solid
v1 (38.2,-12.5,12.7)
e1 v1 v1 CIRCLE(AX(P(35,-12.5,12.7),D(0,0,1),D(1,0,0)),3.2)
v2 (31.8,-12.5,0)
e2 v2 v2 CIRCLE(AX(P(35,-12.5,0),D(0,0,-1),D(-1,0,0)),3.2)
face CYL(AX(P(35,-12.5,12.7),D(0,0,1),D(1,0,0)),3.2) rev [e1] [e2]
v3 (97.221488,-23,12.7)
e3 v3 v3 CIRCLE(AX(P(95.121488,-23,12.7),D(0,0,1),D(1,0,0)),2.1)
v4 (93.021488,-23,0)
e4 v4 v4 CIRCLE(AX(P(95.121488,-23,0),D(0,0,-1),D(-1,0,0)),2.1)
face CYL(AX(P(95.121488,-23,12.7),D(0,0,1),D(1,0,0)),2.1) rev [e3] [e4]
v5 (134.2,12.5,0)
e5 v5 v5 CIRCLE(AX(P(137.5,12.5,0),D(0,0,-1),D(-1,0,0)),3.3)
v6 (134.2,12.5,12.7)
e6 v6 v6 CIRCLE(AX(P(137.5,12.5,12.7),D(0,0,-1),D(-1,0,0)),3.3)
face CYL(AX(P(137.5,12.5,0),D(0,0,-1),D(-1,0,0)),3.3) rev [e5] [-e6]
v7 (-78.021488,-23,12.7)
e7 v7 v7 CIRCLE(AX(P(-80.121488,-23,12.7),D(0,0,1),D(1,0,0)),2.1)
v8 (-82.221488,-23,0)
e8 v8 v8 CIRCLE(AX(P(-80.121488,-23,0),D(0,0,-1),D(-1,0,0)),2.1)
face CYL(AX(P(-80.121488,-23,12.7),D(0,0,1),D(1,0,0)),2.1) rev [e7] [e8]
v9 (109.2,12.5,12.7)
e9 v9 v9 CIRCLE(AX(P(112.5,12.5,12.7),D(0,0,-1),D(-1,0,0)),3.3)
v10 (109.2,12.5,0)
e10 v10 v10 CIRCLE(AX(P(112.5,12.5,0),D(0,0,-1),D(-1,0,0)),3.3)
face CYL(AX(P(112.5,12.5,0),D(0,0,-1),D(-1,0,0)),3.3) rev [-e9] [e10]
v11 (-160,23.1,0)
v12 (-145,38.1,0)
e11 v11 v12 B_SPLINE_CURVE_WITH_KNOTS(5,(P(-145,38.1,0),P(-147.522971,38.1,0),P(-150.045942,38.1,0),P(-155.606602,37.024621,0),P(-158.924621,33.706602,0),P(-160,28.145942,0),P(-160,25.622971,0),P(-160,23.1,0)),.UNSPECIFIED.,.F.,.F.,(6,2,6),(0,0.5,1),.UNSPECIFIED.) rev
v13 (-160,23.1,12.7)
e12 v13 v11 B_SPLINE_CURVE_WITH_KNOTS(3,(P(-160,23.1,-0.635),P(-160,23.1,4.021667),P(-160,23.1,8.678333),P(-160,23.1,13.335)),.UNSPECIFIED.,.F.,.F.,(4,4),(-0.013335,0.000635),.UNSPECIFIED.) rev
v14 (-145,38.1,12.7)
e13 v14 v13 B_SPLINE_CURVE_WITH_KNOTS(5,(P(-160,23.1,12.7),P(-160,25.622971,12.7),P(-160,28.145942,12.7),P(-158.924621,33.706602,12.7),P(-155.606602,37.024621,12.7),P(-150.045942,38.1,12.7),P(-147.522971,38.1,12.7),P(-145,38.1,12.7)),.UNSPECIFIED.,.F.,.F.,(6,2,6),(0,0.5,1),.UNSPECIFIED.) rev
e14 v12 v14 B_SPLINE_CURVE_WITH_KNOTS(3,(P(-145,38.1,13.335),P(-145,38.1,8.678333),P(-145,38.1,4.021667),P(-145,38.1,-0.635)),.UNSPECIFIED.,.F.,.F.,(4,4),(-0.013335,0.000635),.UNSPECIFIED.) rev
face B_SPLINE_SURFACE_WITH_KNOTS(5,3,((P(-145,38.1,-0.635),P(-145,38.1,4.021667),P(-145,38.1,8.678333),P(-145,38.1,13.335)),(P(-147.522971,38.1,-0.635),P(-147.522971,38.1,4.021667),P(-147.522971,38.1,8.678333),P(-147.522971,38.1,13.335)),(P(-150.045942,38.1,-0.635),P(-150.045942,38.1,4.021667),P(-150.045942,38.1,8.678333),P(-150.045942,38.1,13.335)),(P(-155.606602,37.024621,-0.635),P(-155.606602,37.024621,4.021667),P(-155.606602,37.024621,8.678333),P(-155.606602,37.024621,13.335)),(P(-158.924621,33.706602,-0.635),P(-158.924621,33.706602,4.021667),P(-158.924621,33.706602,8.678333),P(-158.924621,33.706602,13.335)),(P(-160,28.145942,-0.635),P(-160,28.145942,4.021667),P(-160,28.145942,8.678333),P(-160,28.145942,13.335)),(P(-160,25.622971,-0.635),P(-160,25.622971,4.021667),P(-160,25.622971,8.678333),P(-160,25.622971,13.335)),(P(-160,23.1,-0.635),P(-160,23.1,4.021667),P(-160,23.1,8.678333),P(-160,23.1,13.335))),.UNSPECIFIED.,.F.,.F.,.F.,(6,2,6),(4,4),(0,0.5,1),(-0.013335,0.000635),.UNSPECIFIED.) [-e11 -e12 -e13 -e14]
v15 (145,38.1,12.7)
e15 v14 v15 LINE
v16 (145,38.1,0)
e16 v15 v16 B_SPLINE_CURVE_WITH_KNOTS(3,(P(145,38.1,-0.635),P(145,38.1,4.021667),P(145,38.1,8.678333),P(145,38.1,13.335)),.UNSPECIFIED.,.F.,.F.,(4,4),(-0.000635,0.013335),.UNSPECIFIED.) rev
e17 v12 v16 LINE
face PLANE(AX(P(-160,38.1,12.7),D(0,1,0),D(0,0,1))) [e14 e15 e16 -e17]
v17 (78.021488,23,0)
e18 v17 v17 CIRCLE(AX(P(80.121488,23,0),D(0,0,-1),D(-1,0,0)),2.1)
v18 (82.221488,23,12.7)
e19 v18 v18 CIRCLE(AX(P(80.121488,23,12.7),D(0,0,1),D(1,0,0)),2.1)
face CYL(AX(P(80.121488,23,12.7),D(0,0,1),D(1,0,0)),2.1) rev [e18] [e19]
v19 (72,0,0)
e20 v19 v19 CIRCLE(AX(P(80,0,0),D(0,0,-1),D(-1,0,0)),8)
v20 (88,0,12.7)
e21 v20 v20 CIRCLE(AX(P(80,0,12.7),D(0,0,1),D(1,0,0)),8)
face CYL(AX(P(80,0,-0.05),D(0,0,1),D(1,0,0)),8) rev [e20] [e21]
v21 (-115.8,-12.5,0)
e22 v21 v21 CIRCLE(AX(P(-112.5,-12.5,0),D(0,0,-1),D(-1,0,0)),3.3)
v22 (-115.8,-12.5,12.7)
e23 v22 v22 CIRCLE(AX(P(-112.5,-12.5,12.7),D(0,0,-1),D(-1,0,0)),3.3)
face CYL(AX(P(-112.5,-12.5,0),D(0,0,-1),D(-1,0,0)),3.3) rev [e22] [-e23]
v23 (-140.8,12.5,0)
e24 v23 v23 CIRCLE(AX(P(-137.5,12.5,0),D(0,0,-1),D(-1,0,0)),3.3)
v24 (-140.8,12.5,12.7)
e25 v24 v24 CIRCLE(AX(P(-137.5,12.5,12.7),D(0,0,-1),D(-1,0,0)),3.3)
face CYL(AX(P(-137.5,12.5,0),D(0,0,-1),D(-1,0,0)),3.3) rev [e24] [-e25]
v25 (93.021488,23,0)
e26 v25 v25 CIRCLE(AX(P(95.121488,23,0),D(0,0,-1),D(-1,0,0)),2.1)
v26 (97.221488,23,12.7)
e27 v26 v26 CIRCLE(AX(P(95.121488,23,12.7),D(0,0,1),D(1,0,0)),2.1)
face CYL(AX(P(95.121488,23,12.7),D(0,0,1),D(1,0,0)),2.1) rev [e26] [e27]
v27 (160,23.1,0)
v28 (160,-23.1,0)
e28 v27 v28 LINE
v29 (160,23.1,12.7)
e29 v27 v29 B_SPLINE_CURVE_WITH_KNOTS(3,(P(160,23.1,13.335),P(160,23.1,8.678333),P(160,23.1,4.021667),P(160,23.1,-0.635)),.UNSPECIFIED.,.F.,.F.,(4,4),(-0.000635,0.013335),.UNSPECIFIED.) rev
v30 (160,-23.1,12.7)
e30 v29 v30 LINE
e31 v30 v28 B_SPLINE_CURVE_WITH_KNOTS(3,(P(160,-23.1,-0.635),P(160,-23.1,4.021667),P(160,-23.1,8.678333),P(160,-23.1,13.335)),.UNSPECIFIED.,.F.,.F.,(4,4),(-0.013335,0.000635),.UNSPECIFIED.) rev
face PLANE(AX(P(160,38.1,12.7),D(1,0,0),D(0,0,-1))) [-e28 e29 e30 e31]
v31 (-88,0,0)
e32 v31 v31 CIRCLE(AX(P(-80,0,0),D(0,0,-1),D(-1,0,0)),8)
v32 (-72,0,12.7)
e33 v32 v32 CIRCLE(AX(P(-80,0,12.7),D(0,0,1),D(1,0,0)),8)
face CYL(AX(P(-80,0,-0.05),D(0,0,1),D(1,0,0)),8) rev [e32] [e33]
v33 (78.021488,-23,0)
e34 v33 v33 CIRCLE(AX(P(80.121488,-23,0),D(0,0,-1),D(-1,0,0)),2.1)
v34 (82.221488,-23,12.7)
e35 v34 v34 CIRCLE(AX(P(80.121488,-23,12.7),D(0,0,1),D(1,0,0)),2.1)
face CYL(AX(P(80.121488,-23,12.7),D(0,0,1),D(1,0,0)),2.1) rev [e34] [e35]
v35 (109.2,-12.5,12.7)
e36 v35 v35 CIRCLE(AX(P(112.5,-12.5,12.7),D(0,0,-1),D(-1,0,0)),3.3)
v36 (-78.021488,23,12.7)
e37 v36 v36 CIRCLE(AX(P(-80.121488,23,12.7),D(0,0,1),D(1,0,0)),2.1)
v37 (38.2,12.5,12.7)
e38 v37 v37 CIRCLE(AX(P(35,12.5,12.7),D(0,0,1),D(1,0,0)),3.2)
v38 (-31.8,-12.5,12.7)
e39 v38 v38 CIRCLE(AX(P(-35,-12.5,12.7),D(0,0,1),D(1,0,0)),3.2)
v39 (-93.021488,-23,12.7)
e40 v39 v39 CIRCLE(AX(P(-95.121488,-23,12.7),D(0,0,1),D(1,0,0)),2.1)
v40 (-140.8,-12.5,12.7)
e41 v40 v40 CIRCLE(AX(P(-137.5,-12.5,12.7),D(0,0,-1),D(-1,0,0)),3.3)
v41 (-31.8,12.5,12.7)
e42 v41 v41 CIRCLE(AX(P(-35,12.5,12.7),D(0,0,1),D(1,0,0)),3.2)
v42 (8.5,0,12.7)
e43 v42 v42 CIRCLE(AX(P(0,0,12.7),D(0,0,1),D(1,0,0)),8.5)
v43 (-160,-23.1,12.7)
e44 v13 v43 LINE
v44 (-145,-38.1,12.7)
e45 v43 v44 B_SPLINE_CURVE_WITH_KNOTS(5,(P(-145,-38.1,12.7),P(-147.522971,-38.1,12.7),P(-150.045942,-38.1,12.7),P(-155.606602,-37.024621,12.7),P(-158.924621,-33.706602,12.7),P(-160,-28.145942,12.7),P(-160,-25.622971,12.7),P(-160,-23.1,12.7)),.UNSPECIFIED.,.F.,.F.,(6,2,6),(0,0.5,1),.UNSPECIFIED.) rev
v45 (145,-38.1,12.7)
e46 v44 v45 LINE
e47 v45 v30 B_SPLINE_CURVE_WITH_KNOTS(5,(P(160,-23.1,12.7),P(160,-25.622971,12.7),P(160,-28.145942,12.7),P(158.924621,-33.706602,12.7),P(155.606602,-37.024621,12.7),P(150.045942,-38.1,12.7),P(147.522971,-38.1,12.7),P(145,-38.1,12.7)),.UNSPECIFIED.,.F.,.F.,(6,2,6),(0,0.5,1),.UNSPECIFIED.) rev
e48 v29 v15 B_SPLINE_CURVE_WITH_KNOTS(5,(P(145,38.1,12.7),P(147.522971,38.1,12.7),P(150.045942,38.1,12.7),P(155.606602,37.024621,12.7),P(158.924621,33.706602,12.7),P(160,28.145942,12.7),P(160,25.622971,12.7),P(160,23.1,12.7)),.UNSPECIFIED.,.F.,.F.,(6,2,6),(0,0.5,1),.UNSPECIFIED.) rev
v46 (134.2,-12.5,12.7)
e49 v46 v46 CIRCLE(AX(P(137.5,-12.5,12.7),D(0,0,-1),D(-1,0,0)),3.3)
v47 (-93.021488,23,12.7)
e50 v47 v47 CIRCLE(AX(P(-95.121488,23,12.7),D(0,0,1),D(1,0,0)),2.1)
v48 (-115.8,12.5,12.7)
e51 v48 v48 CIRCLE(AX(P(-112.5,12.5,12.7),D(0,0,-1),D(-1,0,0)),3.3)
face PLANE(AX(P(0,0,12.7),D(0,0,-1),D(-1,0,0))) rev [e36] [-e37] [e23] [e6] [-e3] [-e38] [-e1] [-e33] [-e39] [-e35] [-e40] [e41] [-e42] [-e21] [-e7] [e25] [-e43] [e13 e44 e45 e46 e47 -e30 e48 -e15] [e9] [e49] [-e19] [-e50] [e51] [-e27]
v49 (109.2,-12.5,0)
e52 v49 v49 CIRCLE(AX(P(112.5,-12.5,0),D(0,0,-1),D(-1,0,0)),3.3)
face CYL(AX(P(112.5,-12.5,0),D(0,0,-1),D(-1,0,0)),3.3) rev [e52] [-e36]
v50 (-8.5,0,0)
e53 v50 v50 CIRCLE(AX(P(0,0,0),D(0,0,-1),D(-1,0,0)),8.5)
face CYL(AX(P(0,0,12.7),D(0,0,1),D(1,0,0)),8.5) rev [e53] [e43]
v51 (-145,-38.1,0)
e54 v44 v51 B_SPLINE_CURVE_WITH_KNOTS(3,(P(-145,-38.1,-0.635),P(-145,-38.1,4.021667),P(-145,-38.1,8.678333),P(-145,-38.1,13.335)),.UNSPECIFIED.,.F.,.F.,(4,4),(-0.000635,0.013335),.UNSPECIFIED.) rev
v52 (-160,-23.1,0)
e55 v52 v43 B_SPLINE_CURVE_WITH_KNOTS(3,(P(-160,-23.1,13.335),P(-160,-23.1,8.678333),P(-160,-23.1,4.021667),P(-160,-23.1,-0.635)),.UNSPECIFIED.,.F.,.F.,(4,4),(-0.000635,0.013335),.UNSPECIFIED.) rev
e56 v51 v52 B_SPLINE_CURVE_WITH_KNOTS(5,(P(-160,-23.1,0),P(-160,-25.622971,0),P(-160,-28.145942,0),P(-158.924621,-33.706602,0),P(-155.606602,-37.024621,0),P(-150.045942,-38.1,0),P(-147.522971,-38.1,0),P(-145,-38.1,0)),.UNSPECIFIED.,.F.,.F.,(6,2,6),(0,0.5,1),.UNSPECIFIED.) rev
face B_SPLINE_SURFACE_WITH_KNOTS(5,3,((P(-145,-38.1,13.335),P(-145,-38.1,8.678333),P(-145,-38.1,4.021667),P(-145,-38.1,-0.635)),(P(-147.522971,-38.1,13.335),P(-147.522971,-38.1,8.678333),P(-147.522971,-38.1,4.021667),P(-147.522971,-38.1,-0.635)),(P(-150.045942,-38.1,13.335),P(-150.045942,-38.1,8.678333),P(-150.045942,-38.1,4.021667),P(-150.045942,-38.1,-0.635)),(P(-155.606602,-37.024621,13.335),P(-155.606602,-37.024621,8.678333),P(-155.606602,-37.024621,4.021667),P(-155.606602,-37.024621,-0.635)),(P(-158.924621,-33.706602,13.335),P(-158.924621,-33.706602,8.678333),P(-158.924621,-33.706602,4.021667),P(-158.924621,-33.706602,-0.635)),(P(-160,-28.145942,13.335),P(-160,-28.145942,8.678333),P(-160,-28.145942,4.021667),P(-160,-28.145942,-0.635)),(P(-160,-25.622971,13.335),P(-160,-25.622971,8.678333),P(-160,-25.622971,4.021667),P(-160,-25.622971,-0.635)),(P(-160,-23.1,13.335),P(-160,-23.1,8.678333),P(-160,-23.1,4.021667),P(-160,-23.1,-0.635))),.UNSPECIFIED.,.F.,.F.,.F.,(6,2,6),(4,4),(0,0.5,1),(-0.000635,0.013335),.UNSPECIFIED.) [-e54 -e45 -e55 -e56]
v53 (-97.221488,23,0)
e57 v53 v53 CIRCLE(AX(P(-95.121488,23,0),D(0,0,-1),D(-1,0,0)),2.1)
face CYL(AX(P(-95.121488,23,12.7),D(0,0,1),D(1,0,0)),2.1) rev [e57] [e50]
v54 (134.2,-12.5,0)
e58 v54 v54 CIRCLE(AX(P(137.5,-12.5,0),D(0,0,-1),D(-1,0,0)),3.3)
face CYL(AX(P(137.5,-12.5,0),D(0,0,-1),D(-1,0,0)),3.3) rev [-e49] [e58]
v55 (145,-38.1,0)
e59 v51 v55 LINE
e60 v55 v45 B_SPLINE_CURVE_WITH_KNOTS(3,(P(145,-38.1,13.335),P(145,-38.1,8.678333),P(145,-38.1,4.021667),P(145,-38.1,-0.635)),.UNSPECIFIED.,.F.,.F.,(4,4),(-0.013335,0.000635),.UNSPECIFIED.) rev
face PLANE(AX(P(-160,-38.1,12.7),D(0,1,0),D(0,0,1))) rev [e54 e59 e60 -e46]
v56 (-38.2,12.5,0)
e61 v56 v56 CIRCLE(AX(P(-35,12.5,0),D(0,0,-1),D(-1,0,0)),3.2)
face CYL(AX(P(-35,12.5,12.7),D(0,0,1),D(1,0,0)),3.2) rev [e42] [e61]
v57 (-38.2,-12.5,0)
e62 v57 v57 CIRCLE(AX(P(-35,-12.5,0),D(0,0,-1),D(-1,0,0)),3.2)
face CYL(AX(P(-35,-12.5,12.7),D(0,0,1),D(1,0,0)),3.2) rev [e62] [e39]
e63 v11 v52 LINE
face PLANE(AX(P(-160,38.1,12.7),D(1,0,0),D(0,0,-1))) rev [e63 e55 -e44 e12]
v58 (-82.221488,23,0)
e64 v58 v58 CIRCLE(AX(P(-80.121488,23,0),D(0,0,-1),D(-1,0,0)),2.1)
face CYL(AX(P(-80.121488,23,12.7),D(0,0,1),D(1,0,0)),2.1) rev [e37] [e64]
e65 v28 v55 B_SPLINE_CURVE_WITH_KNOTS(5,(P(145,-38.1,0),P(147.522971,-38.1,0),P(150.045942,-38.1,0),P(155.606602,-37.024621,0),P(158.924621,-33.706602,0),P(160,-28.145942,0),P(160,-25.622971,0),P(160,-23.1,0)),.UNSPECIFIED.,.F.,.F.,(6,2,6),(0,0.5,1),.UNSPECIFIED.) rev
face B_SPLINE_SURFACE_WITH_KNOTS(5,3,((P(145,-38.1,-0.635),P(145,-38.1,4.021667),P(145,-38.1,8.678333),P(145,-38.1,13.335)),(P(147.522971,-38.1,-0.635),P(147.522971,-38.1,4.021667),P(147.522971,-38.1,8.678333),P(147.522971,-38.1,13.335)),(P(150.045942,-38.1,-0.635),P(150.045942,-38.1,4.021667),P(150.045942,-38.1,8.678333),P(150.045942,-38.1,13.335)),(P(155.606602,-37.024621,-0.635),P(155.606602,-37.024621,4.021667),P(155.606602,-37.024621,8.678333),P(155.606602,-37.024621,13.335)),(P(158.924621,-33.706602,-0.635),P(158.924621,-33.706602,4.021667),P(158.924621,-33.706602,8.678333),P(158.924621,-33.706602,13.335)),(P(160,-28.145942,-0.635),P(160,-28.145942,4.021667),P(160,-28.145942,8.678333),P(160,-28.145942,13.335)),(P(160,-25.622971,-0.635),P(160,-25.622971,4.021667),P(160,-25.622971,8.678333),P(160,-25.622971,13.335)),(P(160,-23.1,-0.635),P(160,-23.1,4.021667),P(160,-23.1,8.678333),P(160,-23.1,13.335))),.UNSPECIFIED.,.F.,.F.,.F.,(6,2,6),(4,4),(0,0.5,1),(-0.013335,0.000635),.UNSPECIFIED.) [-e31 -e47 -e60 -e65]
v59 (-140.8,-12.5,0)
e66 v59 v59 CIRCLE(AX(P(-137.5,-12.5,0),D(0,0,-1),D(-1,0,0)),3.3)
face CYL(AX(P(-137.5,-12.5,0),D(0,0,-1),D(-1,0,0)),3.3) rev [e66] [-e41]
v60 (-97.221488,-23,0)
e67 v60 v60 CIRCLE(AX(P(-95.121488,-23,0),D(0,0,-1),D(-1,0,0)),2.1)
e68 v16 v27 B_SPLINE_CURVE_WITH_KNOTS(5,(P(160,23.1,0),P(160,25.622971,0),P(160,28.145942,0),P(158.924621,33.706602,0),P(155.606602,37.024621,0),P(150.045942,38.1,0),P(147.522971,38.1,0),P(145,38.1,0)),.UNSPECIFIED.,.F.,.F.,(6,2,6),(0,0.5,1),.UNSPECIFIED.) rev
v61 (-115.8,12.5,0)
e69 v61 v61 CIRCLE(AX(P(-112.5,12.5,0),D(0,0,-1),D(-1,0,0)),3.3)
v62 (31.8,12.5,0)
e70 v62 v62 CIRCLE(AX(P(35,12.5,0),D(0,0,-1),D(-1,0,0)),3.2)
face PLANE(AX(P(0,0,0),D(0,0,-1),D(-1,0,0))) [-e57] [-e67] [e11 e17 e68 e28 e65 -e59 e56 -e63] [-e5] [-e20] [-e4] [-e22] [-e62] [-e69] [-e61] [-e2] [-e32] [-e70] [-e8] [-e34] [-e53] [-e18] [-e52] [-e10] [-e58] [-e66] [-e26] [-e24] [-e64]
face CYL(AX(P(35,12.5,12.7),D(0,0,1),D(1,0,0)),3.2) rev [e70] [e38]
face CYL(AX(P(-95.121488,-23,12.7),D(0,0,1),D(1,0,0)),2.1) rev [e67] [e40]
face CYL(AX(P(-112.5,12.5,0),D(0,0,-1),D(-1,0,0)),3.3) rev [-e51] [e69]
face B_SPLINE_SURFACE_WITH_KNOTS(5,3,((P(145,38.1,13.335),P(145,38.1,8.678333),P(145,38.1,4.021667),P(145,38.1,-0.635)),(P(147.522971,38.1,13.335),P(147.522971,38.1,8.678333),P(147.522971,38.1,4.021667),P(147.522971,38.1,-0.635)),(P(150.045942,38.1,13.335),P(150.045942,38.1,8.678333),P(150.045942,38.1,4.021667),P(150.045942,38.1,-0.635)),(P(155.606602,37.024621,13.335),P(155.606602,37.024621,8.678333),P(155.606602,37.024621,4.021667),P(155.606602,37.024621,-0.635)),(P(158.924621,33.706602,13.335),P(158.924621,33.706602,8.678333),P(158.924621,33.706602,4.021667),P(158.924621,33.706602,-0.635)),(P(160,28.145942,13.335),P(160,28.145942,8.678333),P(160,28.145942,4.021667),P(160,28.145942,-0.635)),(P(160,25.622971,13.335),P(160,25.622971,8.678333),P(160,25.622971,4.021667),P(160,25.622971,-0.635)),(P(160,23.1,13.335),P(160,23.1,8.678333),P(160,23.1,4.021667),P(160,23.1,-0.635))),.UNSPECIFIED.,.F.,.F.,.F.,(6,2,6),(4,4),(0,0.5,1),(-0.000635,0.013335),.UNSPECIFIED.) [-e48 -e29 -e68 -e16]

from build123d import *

# Parameters (mm, degrees)
SKETCH1_W                     = 320
SKETCH1_H                     = 76.2
BOSS_EXTRUDE1_DEPTH           = 12.7
M6_CLEARANCE_HOLE1_D          = 6.6
FILLET1_SIZE                  = 15
TAP_DRILL_FOR_M5X0_8_TAP1_D   = 4.2
SKETCH8_R                     = 8
CUT_EXTRUDE1_DEPTH            = 165.963329386
M6_CLEARANCE_HOLE2_D          = 6.4
M16_CLEARANCE_HOLE1_OUTLINE_R = 8.5
M16_CLEARANCE_HOLE1_DEPTH     = 12.7


with BuildPart() as part:
    # Sketch1 → Boss-Extrude1 (new body)
    with BuildSketch(Plane.XY):
        Rectangle(SKETCH1_W, SKETCH1_H)
    extrude(amount=BOSS_EXTRUDE1_DEPTH)

    # M6 Clearance Hole1 (through all)
    with Locations(Plane(origin=(0, 0, 0), x_dir=(-1, 0, 0), z_dir=(0, 0, -1))):
        with Locations((137.5, -12.5), (112.5, -12.5), (112.5, 12.5), (137.5, 12.5), (-112.5, -12.5), (-137.5, -12.5), (-112.5, 12.5), (-137.5, 12.5)):
            Hole(M6_CLEARANCE_HOLE1_D / 2)

    # Fillet1
    # a fillet whose section is not a circle: 15 mm, written as the material it takes off along each edge
    with BuildSketch(Plane(origin=(-160, 38.1, -37.5), x_dir=(1, 0, 0), z_dir=(0, 0, 1)), Plane(origin=(-160, -38.1, -37.5), x_dir=(0, 1, 0), z_dir=(0, 0, 1))) as fillet1_piece_1:
        with BuildLine():
            add(Edge.make_bspline([(FILLET1_SIZE, 0), (FILLET1_SIZE * 0.831801948466, 0), (FILLET1_SIZE * 0.663603896932, 0), (FILLET1_SIZE * 0.292893218813, -FILLET1_SIZE * 0.0716919198361), (FILLET1_SIZE * 0.0716919198361, -FILLET1_SIZE * 0.292893218813), (0, -FILLET1_SIZE * 0.663603896932), (0, -FILLET1_SIZE * 0.831801948466), (0, -FILLET1_SIZE)], knots=[0, 0, 0, 0, 0, 0, 0.5, 0.5, 1, 1, 1, 1, 1, 1], degree=5))
            Line((0, -FILLET1_SIZE), (0, 0))
            Line((0, 0), (FILLET1_SIZE, 0))
        make_face()
    extrude(amount=87.7, mode=Mode.SUBTRACT)
    with BuildSketch(Plane(origin=(160, 38.1, -37.5), x_dir=(-1, 0, 0), z_dir=(0, 0, 1)), Plane(origin=(160, -38.1, -37.5), x_dir=(0, 1, 0), z_dir=(0, 0, 1))) as fillet1_piece_2:
        with BuildLine():
            add(Edge.make_bspline([(FILLET1_SIZE, 0), (FILLET1_SIZE * 0.831801948466, 0), (FILLET1_SIZE * 0.663603896932, 0), (FILLET1_SIZE * 0.292893218813, FILLET1_SIZE * 0.0716919198361), (FILLET1_SIZE * 0.0716919198361, FILLET1_SIZE * 0.292893218813), (0, FILLET1_SIZE * 0.663603896932), (0, FILLET1_SIZE * 0.831801948466), (0, FILLET1_SIZE)], knots=[0, 0, 0, 0, 0, 0, 0.5, 0.5, 1, 1, 1, 1, 1, 1], degree=5))
            Line((0, FILLET1_SIZE), (0, 0))
            Line((0, 0), (FILLET1_SIZE, 0))
        make_face()
    extrude(amount=87.7, mode=Mode.SUBTRACT)

    # Tap Drill for M5x0.8 Tap1 (through all)
    with Locations(Plane.XY.offset(12.7)):
        with Locations((-95.121488027, -23), (-80.121488027, -23), (-95.121488027, 23), (-80.121488027, 23), (80.121488027, -23), (95.121488027, -23), (95.121488027, 23), (80.121488027, 23)):
            Hole(TAP_DRILL_FOR_M5X0_8_TAP1_D / 2)

    # Sketch8 → Cut-Extrude1 (cut, through all)
    with BuildSketch(Plane.XY.offset(12.7)):
        with Locations((-80, 0)):
            Circle(SKETCH8_R)
        with Locations((80, 0)):
            Circle(SKETCH8_R)
    extrude(amount=-CUT_EXTRUDE1_DEPTH, mode=Mode.SUBTRACT)

    # M6 Clearance Hole2 (through all)
    with Locations(Plane.XY.offset(12.7)):
        with Locations((-35, -12.5), (-35, 12.5), (35, 12.5), (35, -12.5)):
            Hole(M6_CLEARANCE_HOLE2_D / 2)

    # M16 Clearance Hole1: read off the stored shape, not the designer's step
    # M16 Clearance Hole1 outline → M16 Clearance Hole1 (cut)
    with BuildSketch(Plane.XY):
        Circle(M16_CLEARANCE_HOLE1_OUTLINE_R)
    extrude(amount=M16_CLEARANCE_HOLE1_DEPTH, mode=Mode.SUBTRACT)


solid = part.part
